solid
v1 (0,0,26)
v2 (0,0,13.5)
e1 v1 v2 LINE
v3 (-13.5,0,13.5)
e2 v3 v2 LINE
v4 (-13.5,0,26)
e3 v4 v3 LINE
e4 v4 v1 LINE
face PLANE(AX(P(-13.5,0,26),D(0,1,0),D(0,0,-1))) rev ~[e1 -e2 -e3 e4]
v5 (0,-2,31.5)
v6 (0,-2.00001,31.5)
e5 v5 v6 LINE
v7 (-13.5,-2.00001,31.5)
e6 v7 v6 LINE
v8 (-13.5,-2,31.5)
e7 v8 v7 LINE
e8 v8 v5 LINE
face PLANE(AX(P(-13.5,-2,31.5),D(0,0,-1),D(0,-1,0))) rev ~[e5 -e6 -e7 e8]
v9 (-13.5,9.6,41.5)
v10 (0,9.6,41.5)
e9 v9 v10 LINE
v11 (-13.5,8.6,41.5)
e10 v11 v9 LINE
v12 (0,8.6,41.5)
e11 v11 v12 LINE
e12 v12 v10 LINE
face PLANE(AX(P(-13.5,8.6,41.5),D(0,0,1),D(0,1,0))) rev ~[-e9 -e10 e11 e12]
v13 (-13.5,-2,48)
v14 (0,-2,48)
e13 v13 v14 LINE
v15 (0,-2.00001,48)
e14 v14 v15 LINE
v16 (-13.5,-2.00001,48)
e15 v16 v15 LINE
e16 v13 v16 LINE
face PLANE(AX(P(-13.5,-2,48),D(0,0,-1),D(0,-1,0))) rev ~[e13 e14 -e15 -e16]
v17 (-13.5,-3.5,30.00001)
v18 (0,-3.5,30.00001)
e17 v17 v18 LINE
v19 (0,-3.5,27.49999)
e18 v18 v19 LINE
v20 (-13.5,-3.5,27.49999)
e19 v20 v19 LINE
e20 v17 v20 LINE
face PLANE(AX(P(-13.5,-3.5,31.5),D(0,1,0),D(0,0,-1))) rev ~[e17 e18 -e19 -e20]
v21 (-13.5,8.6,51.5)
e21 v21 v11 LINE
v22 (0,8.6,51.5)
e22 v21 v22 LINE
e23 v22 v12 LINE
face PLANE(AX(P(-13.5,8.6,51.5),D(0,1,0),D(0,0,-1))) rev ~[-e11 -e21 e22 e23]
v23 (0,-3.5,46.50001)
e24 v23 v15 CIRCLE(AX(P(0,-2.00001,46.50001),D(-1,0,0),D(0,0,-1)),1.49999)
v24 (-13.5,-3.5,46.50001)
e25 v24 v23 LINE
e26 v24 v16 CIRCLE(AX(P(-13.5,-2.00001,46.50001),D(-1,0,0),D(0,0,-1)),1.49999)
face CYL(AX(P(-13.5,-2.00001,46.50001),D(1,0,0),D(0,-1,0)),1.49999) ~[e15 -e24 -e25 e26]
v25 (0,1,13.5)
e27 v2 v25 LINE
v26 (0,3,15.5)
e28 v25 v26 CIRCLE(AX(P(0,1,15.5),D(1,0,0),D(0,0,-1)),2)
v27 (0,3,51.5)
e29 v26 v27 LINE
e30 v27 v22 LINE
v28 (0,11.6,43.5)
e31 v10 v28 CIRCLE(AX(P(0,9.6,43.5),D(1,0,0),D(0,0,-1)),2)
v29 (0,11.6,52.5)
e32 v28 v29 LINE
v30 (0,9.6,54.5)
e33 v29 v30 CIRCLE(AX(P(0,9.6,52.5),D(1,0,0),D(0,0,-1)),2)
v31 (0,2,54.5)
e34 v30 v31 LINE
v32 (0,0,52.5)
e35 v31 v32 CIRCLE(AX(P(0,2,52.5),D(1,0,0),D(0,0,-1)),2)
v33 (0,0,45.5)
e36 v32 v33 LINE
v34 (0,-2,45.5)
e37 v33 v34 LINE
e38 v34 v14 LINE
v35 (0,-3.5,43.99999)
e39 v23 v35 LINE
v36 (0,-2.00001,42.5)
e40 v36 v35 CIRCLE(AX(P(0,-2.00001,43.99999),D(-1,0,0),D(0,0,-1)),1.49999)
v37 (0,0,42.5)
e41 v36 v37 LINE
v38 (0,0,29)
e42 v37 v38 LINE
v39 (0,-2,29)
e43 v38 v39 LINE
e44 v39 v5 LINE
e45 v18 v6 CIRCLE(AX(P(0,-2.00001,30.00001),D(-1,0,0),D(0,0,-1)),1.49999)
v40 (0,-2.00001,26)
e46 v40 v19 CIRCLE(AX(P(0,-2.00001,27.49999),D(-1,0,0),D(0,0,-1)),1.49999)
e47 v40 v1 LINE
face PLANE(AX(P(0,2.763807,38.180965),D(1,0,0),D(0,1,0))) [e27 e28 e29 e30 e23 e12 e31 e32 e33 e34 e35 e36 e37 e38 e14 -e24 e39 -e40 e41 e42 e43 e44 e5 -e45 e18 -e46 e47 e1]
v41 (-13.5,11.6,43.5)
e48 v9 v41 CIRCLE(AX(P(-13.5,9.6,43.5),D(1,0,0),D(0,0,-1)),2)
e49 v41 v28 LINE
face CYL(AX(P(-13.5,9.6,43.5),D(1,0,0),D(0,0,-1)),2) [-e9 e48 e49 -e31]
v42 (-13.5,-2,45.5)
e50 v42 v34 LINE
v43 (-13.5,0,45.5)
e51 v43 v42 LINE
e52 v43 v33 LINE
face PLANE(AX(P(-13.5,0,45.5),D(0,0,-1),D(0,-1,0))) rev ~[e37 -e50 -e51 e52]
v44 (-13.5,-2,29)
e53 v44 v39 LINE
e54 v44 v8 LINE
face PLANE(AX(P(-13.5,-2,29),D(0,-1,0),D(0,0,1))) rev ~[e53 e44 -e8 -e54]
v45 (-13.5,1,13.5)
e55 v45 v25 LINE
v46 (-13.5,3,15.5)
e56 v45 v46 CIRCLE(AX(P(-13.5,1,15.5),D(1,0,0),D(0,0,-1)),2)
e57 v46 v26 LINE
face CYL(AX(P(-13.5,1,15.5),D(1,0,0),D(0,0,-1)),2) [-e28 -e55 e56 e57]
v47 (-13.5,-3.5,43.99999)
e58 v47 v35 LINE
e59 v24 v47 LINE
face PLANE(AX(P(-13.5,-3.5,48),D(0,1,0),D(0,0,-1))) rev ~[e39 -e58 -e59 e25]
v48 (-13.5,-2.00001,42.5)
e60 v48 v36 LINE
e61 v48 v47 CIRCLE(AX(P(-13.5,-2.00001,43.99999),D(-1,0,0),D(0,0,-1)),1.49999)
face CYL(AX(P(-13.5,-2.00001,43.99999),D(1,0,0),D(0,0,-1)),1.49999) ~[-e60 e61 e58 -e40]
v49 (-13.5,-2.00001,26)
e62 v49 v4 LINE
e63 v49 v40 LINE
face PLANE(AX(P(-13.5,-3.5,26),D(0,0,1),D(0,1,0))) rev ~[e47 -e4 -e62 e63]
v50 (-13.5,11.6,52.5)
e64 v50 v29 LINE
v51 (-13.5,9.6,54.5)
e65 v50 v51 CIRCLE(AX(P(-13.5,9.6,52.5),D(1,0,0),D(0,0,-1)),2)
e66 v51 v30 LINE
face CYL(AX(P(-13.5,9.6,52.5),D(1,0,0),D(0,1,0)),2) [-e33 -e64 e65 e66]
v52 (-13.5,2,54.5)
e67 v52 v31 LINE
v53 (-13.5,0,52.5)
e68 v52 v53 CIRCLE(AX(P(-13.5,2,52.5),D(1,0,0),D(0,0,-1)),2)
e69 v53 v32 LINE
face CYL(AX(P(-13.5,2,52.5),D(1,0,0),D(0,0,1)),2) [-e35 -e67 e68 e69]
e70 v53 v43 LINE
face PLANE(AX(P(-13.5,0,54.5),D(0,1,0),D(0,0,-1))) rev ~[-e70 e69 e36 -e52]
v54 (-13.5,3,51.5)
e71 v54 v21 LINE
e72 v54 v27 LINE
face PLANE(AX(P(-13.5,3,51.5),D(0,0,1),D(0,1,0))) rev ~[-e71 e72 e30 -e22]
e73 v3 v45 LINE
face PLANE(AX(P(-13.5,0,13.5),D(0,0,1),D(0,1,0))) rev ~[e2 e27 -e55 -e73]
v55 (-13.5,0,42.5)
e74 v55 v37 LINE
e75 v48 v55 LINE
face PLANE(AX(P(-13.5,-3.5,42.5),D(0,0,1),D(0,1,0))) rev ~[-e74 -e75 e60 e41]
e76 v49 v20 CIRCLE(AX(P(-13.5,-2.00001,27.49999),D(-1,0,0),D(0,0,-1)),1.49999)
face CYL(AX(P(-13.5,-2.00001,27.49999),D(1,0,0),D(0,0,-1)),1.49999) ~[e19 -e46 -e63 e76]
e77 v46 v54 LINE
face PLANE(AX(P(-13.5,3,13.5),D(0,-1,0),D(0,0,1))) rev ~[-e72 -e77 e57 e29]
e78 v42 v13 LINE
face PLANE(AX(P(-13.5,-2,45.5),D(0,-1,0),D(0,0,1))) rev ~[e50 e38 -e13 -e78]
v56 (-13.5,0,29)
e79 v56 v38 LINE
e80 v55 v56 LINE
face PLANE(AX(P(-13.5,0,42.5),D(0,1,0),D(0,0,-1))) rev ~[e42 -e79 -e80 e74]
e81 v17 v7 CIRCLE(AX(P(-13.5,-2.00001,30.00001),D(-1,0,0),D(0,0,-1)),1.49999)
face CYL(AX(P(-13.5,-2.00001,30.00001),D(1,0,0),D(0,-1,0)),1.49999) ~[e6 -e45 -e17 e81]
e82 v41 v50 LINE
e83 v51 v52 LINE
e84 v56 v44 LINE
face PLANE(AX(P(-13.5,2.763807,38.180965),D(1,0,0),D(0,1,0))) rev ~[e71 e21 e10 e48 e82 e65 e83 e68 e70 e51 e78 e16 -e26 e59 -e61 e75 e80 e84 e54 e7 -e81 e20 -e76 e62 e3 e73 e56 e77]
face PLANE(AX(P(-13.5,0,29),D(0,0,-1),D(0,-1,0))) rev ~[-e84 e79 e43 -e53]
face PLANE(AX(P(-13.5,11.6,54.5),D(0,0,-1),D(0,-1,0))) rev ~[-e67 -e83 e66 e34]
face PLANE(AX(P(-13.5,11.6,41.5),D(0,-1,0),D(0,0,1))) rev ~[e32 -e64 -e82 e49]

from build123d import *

# Parameters (mm, degrees)
F1_DEPTH = 13.5
F2_R     = 2
F3_R     = 1.49999
F4_ANGLE = 90
F5_ANGLE = 270


# Not quite as in the source:
# - a fillet or chamfer is up to 0.001 mm smaller than in the source, because OpenCascade refuses the exact size


with BuildPart() as f1:
    # F0 (on Top) → F1 (new body)
    with BuildSketch(Plane.XY):
        Polygon((0, 12.5), (0, 0), (3, 0), (3, 38), (8.6, 38), (8.6, 28), (11.6, 28), (11.6, 41), (0, 41), (0, 32), (-2, 32), (-2, 34.5), (-3.5, 34.5), (-3.5, 29), (0, 29), (0, 15.5), (-2, 15.5), (-2, 18), (-3.5, 18), (-3.5, 12.5), align=None)
    extrude(amount=F1_DEPTH)

    # F2
    f2_edges = [f1.edges().sort_by_distance(p)[0] for p in [
        (0, 41, 6.75),
        (11.6, 41, 6.75),
        (11.6, 28, 6.75),
        (3, 0, 6.75),
    ]]
    fillet(f2_edges, radius=F2_R)

    # F3 (radius 1.5 in the source; OpenCascade refuses exactly that, so slightly less here)
    f3_edges = [f1.edges().sort_by_distance(p)[0] for p in [
        (-3.5, 34.5, 6.75),
        (-3.5, 29, 6.75),
        (-3.5, 18, 6.75),
        (-3.5, 12.5, 6.75),
    ]]
    fillet(f3_edges, radius=F3_R)


with BuildPart() as f1_1:
    # F4: moved
    add(f1.part.rotate(Axis((0, 6.25, 13.5), (0, 1, 0)), F4_ANGLE))


with BuildPart() as f1_2:
    # F5: moved
    add(f1_1.part.rotate(Axis((-6.75, 0, 13.5), (-1, 0, 0)), F5_ANGLE))


solid = f1_2.part
